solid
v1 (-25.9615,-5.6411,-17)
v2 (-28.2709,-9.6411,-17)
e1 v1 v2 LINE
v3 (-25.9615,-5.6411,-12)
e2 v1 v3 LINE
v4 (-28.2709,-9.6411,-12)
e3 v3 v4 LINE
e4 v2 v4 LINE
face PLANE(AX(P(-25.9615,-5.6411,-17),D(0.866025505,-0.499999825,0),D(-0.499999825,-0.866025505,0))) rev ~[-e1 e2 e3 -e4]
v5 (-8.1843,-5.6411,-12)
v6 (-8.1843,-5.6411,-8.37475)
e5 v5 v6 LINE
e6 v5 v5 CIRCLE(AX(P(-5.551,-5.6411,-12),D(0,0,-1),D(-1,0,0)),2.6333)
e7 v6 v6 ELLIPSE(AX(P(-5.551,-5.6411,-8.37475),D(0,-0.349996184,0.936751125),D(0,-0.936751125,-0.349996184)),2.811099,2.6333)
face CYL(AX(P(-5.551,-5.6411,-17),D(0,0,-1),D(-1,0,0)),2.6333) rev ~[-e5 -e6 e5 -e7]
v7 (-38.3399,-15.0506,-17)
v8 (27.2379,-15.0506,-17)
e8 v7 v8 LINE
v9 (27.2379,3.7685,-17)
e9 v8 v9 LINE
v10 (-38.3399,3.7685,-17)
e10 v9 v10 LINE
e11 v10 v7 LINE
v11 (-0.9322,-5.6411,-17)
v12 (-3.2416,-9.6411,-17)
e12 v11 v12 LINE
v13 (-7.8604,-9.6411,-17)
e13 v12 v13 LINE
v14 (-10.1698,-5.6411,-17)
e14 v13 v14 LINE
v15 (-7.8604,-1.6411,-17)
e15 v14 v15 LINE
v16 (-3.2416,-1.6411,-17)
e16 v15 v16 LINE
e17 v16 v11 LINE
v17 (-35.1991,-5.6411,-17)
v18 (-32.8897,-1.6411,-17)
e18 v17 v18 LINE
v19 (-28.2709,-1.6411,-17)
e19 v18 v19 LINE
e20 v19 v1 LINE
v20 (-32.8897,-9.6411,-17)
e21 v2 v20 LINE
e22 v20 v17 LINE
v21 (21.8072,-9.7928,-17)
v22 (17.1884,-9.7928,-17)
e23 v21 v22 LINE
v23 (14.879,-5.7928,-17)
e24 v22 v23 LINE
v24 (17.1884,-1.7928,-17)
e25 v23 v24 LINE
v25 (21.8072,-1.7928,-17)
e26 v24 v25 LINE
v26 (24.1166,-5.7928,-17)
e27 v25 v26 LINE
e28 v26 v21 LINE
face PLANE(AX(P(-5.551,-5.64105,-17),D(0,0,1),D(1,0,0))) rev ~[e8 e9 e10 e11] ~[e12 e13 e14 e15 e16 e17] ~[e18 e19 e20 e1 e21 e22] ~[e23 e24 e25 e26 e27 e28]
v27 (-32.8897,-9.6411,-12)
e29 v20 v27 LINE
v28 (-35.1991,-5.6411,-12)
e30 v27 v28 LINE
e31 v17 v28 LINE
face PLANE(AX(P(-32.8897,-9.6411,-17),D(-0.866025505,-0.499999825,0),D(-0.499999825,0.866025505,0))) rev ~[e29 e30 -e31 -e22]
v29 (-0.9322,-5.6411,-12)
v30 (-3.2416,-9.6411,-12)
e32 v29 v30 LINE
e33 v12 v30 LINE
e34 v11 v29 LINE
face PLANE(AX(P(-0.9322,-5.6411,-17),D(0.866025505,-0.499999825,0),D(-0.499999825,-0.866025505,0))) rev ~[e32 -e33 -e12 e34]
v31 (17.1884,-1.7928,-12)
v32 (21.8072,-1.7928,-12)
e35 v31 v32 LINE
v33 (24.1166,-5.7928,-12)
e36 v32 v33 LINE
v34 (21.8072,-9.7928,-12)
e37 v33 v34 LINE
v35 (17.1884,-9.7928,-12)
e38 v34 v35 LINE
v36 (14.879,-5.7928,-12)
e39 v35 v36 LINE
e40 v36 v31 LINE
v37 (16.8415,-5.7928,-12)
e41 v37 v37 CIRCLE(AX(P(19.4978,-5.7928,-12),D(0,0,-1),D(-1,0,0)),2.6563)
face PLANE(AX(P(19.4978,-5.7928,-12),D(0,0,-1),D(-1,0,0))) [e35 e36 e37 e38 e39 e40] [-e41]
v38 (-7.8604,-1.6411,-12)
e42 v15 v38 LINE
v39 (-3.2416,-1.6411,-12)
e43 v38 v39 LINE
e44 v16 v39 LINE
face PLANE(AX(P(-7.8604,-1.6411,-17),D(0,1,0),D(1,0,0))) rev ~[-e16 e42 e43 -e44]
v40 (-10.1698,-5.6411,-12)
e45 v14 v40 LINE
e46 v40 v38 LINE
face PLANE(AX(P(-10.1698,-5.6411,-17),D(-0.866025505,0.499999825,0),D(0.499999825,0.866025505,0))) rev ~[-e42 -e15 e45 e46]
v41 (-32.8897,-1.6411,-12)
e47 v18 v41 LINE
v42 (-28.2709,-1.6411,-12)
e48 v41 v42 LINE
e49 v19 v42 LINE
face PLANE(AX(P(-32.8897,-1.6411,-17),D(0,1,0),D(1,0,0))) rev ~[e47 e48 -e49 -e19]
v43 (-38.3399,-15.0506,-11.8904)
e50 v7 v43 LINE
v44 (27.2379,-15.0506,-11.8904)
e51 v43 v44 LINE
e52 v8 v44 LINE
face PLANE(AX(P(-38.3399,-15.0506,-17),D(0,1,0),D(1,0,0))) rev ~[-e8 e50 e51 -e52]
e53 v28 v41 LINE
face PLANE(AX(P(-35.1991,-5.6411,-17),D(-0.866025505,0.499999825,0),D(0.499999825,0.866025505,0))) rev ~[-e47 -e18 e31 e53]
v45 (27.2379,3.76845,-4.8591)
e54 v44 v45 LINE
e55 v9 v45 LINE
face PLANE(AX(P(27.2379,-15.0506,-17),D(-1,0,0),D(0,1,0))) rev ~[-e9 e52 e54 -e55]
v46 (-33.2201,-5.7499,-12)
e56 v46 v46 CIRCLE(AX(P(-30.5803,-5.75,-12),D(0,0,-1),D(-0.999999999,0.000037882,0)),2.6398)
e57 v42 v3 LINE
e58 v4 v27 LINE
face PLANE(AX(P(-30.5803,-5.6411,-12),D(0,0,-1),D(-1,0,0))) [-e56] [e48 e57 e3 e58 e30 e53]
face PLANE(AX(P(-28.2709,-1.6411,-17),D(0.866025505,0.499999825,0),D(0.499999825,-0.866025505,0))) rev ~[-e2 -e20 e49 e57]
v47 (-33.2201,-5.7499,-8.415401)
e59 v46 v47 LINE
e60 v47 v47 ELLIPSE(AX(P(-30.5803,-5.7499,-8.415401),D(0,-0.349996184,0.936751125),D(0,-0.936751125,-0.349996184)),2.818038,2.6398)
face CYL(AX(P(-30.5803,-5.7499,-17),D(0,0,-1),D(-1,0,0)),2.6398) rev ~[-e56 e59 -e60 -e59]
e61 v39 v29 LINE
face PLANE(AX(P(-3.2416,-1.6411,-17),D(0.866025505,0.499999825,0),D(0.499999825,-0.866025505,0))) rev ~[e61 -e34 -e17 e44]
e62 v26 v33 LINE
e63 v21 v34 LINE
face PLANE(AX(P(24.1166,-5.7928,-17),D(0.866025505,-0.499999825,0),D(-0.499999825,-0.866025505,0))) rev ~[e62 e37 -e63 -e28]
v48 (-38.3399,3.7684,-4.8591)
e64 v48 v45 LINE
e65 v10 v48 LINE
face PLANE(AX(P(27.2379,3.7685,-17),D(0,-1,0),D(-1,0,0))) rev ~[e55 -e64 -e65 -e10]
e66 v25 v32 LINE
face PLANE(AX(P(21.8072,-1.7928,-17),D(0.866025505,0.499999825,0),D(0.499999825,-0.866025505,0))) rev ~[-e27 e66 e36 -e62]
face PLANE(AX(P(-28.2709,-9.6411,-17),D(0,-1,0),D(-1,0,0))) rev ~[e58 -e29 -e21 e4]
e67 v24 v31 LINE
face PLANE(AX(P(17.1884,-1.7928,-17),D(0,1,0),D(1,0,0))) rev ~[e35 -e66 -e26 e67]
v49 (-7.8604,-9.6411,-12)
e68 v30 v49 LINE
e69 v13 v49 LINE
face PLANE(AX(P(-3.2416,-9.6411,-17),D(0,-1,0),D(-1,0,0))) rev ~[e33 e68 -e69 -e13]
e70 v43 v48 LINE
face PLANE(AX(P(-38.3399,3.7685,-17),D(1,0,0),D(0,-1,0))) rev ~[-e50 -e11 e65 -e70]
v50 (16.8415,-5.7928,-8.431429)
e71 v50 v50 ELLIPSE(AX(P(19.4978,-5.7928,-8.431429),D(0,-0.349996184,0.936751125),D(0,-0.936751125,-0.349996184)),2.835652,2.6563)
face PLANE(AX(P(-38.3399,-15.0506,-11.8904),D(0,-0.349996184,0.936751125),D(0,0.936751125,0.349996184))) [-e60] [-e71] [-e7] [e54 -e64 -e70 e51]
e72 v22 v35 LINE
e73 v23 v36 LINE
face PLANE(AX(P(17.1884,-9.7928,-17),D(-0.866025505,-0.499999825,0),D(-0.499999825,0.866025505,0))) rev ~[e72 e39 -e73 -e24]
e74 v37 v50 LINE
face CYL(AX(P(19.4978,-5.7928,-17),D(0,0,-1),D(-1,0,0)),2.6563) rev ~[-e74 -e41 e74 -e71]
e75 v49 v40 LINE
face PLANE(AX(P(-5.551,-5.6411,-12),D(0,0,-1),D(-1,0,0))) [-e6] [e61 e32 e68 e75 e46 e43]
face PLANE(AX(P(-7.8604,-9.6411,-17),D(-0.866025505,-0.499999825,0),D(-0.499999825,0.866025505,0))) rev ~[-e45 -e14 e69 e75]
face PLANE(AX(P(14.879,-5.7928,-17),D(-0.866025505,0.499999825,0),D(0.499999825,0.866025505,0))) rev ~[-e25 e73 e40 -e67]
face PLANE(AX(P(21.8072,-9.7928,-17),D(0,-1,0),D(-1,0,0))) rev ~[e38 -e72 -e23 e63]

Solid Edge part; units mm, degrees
sketch "Sketch1" plane through (0, 0, -17) normal (0, 0, -1) x (-1, 0, 0)
  circle A0 centre (30.5803, -5.7499) radius 2.6398
  line L0 (38.3399, -15.0506) -> (-27.2379, -15.0506)
  line L1 (-27.2379, -15.0506) -> (-27.2379, 3.7685)
  line L2 (-27.2379, 3.7685) -> (38.3399, 3.7685)
  line L3 (38.3399, 3.7685) -> (38.3399, -15.0506)
  circle A1 centre (5.551, -5.6411) radius 2.6333
  circle A2 centre (-19.4978, -5.7928) radius 2.6563
  dimension "D1" = 5.2666
  dimension "D2" = 5.3126
  dimension "D3" = 5.2796
  dimension "D4" = 65.5778
  dimension "D5" = 18.819
extrude "Protrusion1" add sketch "Sketch1" against normal blind 13
sketch "Sketch2" plane through (-38.3399, -5.6411, -10.5) normal (-1, 0, 0) x (0, 1, 0)
  line L0 (-9.4095, 1.3904) -> (9.4095, -5.6409)
  line L1 (9.4095, -6.5) -> (9.4095, -5.6409)
  line L2 (9.4095, -6.5) -> (-9.4095, -6.5)
  line L3 (-9.4095, -6.5) -> (-9.4095, 1.3904)
extrude "ExtrudedCutout_1" cut sketch "Sketch2" against normal blind 81
sketch "Sketch3" plane through (-5.551, -5.6411, -17) normal (0, 0, -1) x (0, 1, 0)
  circle A0 centre (0, 0) radius 2.6333
  line L0 (0, -4.6188) -> (4, -2.3094)
  line L1 (4, -2.3094) -> (4, 2.3094)
  line L2 (4, 2.3094) -> (0, 4.6188)
  line L3 (0, 4.6188) -> (-4, 2.3094)
  line L4 (-4, 2.3094) -> (-4, -2.3094)
  line L5 (-4, -2.3094) -> (0, -4.6188)
  circle A1 centre (-0.1517, 25.0488) radius 2.6563
  line L6 (-0.1517, 20.43) -> (3.8483, 22.7394)
  line L7 (3.8483, 22.7394) -> (3.8483, 27.3582)
  line L8 (3.8483, 27.3582) -> (-0.1517, 29.6676)
  line L9 (-0.1517, 29.6676) -> (-4.1517, 27.3582)
  line L10 (-4.1517, 27.3582) -> (-4.1517, 22.7394)
  line L11 (-4.1517, 22.7394) -> (-0.1517, 20.43)
  circle A2 centre (-0.1089, -25.0293) radius 2.6398
  line L12 (-4, -27.3387) -> (0, -29.6481)
  line L13 (0, -29.6481) -> (4, -27.3387)
  line L14 (4, -27.3387) -> (4, -22.7199)
  line L15 (4, -22.7199) -> (0, -20.4105)
  line L16 (0, -20.4105) -> (-4, -22.7199)
  line L17 (-4, -22.7199) -> (-4, -27.3387)
extrude "ExtrudedCutout_2" cut sketch "Sketch3" against normal blind 5
